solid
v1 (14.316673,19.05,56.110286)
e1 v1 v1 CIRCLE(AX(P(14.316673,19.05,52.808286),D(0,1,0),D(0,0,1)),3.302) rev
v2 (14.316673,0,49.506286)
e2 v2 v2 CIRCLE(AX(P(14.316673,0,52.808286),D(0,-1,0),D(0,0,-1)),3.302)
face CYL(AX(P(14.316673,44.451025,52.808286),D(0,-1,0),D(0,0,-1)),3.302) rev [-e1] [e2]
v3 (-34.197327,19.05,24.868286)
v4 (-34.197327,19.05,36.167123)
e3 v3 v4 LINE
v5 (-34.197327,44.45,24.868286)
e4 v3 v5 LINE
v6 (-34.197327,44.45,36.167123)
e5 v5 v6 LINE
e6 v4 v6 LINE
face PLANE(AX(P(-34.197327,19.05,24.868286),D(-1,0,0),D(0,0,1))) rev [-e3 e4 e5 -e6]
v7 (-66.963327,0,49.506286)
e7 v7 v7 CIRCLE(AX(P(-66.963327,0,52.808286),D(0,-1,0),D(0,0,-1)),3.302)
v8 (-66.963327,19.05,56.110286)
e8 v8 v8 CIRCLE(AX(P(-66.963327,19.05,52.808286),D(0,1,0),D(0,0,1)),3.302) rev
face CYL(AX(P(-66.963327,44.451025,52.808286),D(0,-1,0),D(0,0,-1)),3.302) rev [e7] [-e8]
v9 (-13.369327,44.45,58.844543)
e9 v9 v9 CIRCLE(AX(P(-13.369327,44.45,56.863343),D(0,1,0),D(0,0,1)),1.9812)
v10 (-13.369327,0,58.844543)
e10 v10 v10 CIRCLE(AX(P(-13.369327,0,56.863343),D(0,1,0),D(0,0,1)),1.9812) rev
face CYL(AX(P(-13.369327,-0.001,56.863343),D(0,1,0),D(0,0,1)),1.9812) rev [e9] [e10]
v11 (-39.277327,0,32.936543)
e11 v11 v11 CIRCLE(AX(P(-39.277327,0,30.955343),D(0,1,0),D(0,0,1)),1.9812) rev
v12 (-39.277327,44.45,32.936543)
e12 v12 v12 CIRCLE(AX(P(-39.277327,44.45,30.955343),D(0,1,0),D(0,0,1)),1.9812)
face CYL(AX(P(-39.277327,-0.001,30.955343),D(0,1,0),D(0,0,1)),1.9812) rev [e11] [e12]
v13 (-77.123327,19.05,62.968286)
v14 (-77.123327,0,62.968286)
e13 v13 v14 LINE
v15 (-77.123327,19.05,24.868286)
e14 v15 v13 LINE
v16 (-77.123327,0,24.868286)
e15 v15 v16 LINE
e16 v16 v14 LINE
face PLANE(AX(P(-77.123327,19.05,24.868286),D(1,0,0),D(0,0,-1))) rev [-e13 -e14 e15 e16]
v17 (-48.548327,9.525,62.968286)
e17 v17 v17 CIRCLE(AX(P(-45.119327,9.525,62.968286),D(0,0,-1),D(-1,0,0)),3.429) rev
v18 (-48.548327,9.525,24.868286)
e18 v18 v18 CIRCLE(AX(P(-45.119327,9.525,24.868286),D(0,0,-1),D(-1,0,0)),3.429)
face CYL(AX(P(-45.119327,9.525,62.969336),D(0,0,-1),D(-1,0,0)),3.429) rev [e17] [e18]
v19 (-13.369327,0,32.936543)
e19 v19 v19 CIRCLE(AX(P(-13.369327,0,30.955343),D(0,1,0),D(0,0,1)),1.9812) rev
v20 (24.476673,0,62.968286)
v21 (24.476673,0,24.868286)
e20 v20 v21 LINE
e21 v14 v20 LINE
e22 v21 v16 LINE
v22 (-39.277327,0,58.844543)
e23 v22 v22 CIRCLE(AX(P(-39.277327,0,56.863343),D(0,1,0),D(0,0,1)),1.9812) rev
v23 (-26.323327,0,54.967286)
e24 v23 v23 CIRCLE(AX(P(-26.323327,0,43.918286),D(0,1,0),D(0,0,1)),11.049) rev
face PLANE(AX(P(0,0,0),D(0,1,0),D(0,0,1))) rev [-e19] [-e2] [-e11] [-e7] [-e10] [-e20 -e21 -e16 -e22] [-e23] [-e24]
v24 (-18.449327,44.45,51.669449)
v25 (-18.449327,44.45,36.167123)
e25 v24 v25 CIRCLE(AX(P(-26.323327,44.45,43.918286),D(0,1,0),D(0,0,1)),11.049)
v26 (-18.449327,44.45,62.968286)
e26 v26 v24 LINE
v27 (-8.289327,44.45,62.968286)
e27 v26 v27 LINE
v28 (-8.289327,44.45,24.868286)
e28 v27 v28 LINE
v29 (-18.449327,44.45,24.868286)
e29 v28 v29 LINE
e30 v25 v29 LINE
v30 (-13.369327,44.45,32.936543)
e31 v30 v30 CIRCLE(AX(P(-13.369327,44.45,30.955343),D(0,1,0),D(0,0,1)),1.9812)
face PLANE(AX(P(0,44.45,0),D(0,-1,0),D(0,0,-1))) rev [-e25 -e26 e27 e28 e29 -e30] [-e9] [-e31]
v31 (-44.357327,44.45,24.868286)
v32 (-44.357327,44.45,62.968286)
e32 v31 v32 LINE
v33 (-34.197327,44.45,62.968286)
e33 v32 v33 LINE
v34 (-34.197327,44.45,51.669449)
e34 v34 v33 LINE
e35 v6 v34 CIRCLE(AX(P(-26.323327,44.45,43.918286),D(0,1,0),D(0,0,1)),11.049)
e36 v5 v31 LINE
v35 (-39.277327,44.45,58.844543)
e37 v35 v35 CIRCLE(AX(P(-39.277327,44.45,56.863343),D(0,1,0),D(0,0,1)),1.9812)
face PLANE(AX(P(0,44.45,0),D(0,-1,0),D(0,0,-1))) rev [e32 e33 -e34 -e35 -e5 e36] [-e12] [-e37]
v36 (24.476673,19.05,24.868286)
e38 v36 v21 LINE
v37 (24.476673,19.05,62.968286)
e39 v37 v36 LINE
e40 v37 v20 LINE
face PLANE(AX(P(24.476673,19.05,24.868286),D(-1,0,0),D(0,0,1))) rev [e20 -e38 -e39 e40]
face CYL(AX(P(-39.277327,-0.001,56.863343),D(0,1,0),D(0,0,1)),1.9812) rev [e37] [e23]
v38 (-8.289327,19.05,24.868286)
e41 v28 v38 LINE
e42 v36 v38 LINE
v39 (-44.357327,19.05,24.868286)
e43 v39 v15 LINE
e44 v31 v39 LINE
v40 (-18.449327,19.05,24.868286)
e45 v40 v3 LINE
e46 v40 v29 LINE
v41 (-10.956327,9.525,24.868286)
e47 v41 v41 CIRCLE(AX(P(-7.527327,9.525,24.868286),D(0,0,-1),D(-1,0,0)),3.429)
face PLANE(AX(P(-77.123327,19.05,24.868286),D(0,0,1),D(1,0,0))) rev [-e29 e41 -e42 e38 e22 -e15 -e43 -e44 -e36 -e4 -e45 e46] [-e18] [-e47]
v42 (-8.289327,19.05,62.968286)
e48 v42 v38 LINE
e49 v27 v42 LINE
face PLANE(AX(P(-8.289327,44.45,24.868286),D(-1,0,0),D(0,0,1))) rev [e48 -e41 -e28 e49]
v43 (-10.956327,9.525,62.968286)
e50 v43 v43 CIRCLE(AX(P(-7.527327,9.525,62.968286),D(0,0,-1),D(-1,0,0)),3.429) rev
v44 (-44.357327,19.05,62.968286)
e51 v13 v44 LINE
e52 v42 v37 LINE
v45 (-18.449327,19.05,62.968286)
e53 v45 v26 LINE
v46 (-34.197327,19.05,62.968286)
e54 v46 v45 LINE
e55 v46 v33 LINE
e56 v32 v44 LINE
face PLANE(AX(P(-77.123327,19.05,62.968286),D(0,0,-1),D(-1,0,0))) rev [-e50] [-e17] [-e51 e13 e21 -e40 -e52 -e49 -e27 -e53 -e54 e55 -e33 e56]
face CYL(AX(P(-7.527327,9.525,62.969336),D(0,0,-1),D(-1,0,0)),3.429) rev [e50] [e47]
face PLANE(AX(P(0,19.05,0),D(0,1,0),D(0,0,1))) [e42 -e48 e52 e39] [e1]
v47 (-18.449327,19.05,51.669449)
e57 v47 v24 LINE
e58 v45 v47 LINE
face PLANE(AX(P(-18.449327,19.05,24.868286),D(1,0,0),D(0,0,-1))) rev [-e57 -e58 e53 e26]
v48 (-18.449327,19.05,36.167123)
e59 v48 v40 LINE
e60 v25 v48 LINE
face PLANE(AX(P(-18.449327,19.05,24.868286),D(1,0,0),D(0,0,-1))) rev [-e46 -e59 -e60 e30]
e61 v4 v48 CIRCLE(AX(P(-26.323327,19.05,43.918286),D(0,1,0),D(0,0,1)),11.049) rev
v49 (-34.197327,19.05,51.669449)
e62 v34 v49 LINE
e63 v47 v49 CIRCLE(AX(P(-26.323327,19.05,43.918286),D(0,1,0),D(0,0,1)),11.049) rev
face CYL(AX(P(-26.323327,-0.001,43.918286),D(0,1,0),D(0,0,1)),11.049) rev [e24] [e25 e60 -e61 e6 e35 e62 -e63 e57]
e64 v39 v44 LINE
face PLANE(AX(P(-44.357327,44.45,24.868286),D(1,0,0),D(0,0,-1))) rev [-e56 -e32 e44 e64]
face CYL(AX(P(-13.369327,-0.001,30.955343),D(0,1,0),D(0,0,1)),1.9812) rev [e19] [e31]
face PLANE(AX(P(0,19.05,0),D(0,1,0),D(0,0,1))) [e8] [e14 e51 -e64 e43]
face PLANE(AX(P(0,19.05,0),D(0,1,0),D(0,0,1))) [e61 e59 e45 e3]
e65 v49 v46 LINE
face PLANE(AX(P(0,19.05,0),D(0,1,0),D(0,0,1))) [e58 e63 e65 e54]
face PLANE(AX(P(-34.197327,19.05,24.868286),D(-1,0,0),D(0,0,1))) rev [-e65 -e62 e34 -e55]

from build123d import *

# Parameters (mm, degrees)
SKETCH3_W               = 101.6
SKETCH3_H               = 38.1
BOSS_EXTRUDE2_DEPTH     = 19.05
BOSS_EXTRUDE4_START     = 24.868285686
BOSS_EXTRUDE4_OUTLINE_W = 36.068
BOSS_EXTRUDE4_OUTLINE_H = 25.4
BOSS_EXTRUDE4_DEPTH     = 38.1
CUT_EXTRUDE2_REACH      = 111.036
SKETCH7_R               = 11.049
SKETCH7_R_2             = 1.9812
SKETCH8_W               = 15.748
SKETCH8_H               = 38.1
CUT_EXTRUDE3_DEPTH      = 25.4
CUT_EXTRUDE4_REACH      = 111.036
SKETCH9_R               = 3.302
CUT_EXTRUDE5_REACH      = 98.827
SKETCH11_R              = 3.429


# Read off the part's stored shape, not the designer's step: Boss-Extrude4
with BuildPart() as part:
    # Sketch3 → Boss-Extrude2 (new body)
    with BuildSketch(Plane(origin=(0, 0, 0), x_dir=(1, 0, 0), z_dir=(0, 1, 0))):
        with Locations((-26.323326811, -43.918285686)):
            Rectangle(SKETCH3_W, SKETCH3_H)
    extrude(amount=BOSS_EXTRUDE2_DEPTH)

    # Boss-Extrude4 outline → Boss-Extrude4 (add)
    with BuildSketch(Plane.XY.offset(BOSS_EXTRUDE4_START)):
        with Locations((-26.323326811, 31.75)):
            Rectangle(BOSS_EXTRUDE4_OUTLINE_W, BOSS_EXTRUDE4_OUTLINE_H)
    extrude(amount=BOSS_EXTRUDE4_DEPTH)

    # Sketch7 → Cut-Extrude2 (cut, up to next)
    with BuildSketch(Plane(origin=(0, 44.45, 0), x_dir=(1, 0, 0), z_dir=(0, 1, 0)), mode=Mode.PRIVATE) as cut_extrude2_sk1:
        with Locations(Location((-26.323326811, -43.918285686, 0), (0, 0, 270))):
            Circle(SKETCH7_R)
    cut_extrude2_tool1 = extrude(cut_extrude2_sk1.sketch, amount=-CUT_EXTRUDE2_REACH, mode=Mode.PRIVATE) & part.part
    # Sketch7 → Cut-Extrude2 (cut, up to next)
    with BuildSketch(Plane(origin=(0, 44.45, 0), x_dir=(1, 0, 0), z_dir=(0, 1, 0)), mode=Mode.PRIVATE) as cut_extrude2_sk2:
        with Locations(Location((-13.369326811, -56.863342795, 0), (0, 0, 270))):
            Circle(SKETCH7_R_2)
    cut_extrude2_tool2 = extrude(cut_extrude2_sk2.sketch, amount=-CUT_EXTRUDE2_REACH, mode=Mode.PRIVATE) & part.part
    # Sketch7 → Cut-Extrude2 (cut, up to next)
    with BuildSketch(Plane(origin=(0, 44.45, 0), x_dir=(1, 0, 0), z_dir=(0, 1, 0)), mode=Mode.PRIVATE) as cut_extrude2_sk3:
        with Locations(Location((-39.277326811, -56.863342795, 0), (0, 0, 270))):
            Circle(SKETCH7_R_2)
    cut_extrude2_tool3 = extrude(cut_extrude2_sk3.sketch, amount=-CUT_EXTRUDE2_REACH, mode=Mode.PRIVATE) & part.part
    # Sketch7 → Cut-Extrude2 (cut, up to next)
    with BuildSketch(Plane(origin=(0, 44.45, 0), x_dir=(1, 0, 0), z_dir=(0, 1, 0)), mode=Mode.PRIVATE) as cut_extrude2_sk4:
        with Locations(Location((-39.277326811, -30.955342795, 0), (0, 0, 270))):
            Circle(SKETCH7_R_2)
    cut_extrude2_tool4 = extrude(cut_extrude2_sk4.sketch, amount=-CUT_EXTRUDE2_REACH, mode=Mode.PRIVATE) & part.part
    # Sketch7 → Cut-Extrude2 (cut, up to next)
    with BuildSketch(Plane(origin=(0, 44.45, 0), x_dir=(1, 0, 0), z_dir=(0, 1, 0)), mode=Mode.PRIVATE) as cut_extrude2_sk5:
        with Locations(Location((-13.369326811, -30.955342795, 0), (0, 0, 270))):
            Circle(SKETCH7_R_2)
    cut_extrude2_tool5 = extrude(cut_extrude2_sk5.sketch, amount=-CUT_EXTRUDE2_REACH, mode=Mode.PRIVATE) & part.part
    add(cut_extrude2_tool1.solids().sort_by_distance((-26.323327, 44.45, 43.918286))[0], mode=Mode.SUBTRACT)
    add(cut_extrude2_tool2.solids().sort_by_distance((-13.369327, 44.45, 56.863343))[0], mode=Mode.SUBTRACT)
    add(cut_extrude2_tool3.solids().sort_by_distance((-39.277327, 44.45, 56.863343))[0], mode=Mode.SUBTRACT)
    add(cut_extrude2_tool4.solids().sort_by_distance((-39.277327, 44.45, 30.955343))[0], mode=Mode.SUBTRACT)
    add(cut_extrude2_tool5.solids().sort_by_distance((-13.369327, 44.45, 30.955343))[0], mode=Mode.SUBTRACT)

    # Sketch8 → Cut-Extrude3 (cut)
    with BuildSketch(Plane(origin=(0, 44.45, 0), x_dir=(1, 0, 0), z_dir=(0, 1, 0))):
        with Locations((-26.323326811, -43.918285686)):
            Rectangle(SKETCH8_W, SKETCH8_H)
    extrude(amount=-CUT_EXTRUDE3_DEPTH, mode=Mode.SUBTRACT)

    # Sketch9 → Cut-Extrude4 (cut, up to next)
    with BuildSketch(Plane.XZ, mode=Mode.PRIVATE) as cut_extrude4_sk1:
        with Locations(Location((14.316673189, 52.808285686, 0), (0, 0, 270))):
            Circle(SKETCH9_R)
    cut_extrude4_tool1 = extrude(cut_extrude4_sk1.sketch, amount=-CUT_EXTRUDE4_REACH, mode=Mode.PRIVATE) & part.part
    # Sketch9 → Cut-Extrude4 (cut, up to next)
    with BuildSketch(Plane.XZ, mode=Mode.PRIVATE) as cut_extrude4_sk2:
        with Locations(Location((-66.963326811, 52.808285686, 0), (0, 0, 270))):
            Circle(SKETCH9_R)
    cut_extrude4_tool2 = extrude(cut_extrude4_sk2.sketch, amount=-CUT_EXTRUDE4_REACH, mode=Mode.PRIVATE) & part.part
    add(cut_extrude4_tool1.solids().sort_by_distance((14.316673, 0, 52.808286))[0], mode=Mode.SUBTRACT)
    add(cut_extrude4_tool2.solids().sort_by_distance((-66.963327, 0, 52.808286))[0], mode=Mode.SUBTRACT)

    # Sketch11 → Cut-Extrude5 (cut, up to next)
    with BuildSketch(Plane(origin=(0, 0, 24.868285686), x_dir=(-1, 0, 0), z_dir=(0, 0, -1)), mode=Mode.PRIVATE) as cut_extrude5_sk1:
        with Locations((7.527326811, 9.525)):
            Circle(SKETCH11_R)
    cut_extrude5_tool1 = extrude(cut_extrude5_sk1.sketch, amount=-CUT_EXTRUDE5_REACH, mode=Mode.PRIVATE) & part.part
    # Sketch11 → Cut-Extrude5 (cut, up to next)
    with BuildSketch(Plane(origin=(0, 0, 24.868285686), x_dir=(-1, 0, 0), z_dir=(0, 0, -1)), mode=Mode.PRIVATE) as cut_extrude5_sk2:
        with Locations((45.119326811, 9.525)):
            Circle(SKETCH11_R)
    cut_extrude5_tool2 = extrude(cut_extrude5_sk2.sketch, amount=-CUT_EXTRUDE5_REACH, mode=Mode.PRIVATE) & part.part
    add(cut_extrude5_tool1.solids().sort_by_distance((-7.527327, 9.525, 24.868286))[0], mode=Mode.SUBTRACT)
    add(cut_extrude5_tool2.solids().sort_by_distance((-45.119327, 9.525, 24.868286))[0], mode=Mode.SUBTRACT)


solid = part.part
